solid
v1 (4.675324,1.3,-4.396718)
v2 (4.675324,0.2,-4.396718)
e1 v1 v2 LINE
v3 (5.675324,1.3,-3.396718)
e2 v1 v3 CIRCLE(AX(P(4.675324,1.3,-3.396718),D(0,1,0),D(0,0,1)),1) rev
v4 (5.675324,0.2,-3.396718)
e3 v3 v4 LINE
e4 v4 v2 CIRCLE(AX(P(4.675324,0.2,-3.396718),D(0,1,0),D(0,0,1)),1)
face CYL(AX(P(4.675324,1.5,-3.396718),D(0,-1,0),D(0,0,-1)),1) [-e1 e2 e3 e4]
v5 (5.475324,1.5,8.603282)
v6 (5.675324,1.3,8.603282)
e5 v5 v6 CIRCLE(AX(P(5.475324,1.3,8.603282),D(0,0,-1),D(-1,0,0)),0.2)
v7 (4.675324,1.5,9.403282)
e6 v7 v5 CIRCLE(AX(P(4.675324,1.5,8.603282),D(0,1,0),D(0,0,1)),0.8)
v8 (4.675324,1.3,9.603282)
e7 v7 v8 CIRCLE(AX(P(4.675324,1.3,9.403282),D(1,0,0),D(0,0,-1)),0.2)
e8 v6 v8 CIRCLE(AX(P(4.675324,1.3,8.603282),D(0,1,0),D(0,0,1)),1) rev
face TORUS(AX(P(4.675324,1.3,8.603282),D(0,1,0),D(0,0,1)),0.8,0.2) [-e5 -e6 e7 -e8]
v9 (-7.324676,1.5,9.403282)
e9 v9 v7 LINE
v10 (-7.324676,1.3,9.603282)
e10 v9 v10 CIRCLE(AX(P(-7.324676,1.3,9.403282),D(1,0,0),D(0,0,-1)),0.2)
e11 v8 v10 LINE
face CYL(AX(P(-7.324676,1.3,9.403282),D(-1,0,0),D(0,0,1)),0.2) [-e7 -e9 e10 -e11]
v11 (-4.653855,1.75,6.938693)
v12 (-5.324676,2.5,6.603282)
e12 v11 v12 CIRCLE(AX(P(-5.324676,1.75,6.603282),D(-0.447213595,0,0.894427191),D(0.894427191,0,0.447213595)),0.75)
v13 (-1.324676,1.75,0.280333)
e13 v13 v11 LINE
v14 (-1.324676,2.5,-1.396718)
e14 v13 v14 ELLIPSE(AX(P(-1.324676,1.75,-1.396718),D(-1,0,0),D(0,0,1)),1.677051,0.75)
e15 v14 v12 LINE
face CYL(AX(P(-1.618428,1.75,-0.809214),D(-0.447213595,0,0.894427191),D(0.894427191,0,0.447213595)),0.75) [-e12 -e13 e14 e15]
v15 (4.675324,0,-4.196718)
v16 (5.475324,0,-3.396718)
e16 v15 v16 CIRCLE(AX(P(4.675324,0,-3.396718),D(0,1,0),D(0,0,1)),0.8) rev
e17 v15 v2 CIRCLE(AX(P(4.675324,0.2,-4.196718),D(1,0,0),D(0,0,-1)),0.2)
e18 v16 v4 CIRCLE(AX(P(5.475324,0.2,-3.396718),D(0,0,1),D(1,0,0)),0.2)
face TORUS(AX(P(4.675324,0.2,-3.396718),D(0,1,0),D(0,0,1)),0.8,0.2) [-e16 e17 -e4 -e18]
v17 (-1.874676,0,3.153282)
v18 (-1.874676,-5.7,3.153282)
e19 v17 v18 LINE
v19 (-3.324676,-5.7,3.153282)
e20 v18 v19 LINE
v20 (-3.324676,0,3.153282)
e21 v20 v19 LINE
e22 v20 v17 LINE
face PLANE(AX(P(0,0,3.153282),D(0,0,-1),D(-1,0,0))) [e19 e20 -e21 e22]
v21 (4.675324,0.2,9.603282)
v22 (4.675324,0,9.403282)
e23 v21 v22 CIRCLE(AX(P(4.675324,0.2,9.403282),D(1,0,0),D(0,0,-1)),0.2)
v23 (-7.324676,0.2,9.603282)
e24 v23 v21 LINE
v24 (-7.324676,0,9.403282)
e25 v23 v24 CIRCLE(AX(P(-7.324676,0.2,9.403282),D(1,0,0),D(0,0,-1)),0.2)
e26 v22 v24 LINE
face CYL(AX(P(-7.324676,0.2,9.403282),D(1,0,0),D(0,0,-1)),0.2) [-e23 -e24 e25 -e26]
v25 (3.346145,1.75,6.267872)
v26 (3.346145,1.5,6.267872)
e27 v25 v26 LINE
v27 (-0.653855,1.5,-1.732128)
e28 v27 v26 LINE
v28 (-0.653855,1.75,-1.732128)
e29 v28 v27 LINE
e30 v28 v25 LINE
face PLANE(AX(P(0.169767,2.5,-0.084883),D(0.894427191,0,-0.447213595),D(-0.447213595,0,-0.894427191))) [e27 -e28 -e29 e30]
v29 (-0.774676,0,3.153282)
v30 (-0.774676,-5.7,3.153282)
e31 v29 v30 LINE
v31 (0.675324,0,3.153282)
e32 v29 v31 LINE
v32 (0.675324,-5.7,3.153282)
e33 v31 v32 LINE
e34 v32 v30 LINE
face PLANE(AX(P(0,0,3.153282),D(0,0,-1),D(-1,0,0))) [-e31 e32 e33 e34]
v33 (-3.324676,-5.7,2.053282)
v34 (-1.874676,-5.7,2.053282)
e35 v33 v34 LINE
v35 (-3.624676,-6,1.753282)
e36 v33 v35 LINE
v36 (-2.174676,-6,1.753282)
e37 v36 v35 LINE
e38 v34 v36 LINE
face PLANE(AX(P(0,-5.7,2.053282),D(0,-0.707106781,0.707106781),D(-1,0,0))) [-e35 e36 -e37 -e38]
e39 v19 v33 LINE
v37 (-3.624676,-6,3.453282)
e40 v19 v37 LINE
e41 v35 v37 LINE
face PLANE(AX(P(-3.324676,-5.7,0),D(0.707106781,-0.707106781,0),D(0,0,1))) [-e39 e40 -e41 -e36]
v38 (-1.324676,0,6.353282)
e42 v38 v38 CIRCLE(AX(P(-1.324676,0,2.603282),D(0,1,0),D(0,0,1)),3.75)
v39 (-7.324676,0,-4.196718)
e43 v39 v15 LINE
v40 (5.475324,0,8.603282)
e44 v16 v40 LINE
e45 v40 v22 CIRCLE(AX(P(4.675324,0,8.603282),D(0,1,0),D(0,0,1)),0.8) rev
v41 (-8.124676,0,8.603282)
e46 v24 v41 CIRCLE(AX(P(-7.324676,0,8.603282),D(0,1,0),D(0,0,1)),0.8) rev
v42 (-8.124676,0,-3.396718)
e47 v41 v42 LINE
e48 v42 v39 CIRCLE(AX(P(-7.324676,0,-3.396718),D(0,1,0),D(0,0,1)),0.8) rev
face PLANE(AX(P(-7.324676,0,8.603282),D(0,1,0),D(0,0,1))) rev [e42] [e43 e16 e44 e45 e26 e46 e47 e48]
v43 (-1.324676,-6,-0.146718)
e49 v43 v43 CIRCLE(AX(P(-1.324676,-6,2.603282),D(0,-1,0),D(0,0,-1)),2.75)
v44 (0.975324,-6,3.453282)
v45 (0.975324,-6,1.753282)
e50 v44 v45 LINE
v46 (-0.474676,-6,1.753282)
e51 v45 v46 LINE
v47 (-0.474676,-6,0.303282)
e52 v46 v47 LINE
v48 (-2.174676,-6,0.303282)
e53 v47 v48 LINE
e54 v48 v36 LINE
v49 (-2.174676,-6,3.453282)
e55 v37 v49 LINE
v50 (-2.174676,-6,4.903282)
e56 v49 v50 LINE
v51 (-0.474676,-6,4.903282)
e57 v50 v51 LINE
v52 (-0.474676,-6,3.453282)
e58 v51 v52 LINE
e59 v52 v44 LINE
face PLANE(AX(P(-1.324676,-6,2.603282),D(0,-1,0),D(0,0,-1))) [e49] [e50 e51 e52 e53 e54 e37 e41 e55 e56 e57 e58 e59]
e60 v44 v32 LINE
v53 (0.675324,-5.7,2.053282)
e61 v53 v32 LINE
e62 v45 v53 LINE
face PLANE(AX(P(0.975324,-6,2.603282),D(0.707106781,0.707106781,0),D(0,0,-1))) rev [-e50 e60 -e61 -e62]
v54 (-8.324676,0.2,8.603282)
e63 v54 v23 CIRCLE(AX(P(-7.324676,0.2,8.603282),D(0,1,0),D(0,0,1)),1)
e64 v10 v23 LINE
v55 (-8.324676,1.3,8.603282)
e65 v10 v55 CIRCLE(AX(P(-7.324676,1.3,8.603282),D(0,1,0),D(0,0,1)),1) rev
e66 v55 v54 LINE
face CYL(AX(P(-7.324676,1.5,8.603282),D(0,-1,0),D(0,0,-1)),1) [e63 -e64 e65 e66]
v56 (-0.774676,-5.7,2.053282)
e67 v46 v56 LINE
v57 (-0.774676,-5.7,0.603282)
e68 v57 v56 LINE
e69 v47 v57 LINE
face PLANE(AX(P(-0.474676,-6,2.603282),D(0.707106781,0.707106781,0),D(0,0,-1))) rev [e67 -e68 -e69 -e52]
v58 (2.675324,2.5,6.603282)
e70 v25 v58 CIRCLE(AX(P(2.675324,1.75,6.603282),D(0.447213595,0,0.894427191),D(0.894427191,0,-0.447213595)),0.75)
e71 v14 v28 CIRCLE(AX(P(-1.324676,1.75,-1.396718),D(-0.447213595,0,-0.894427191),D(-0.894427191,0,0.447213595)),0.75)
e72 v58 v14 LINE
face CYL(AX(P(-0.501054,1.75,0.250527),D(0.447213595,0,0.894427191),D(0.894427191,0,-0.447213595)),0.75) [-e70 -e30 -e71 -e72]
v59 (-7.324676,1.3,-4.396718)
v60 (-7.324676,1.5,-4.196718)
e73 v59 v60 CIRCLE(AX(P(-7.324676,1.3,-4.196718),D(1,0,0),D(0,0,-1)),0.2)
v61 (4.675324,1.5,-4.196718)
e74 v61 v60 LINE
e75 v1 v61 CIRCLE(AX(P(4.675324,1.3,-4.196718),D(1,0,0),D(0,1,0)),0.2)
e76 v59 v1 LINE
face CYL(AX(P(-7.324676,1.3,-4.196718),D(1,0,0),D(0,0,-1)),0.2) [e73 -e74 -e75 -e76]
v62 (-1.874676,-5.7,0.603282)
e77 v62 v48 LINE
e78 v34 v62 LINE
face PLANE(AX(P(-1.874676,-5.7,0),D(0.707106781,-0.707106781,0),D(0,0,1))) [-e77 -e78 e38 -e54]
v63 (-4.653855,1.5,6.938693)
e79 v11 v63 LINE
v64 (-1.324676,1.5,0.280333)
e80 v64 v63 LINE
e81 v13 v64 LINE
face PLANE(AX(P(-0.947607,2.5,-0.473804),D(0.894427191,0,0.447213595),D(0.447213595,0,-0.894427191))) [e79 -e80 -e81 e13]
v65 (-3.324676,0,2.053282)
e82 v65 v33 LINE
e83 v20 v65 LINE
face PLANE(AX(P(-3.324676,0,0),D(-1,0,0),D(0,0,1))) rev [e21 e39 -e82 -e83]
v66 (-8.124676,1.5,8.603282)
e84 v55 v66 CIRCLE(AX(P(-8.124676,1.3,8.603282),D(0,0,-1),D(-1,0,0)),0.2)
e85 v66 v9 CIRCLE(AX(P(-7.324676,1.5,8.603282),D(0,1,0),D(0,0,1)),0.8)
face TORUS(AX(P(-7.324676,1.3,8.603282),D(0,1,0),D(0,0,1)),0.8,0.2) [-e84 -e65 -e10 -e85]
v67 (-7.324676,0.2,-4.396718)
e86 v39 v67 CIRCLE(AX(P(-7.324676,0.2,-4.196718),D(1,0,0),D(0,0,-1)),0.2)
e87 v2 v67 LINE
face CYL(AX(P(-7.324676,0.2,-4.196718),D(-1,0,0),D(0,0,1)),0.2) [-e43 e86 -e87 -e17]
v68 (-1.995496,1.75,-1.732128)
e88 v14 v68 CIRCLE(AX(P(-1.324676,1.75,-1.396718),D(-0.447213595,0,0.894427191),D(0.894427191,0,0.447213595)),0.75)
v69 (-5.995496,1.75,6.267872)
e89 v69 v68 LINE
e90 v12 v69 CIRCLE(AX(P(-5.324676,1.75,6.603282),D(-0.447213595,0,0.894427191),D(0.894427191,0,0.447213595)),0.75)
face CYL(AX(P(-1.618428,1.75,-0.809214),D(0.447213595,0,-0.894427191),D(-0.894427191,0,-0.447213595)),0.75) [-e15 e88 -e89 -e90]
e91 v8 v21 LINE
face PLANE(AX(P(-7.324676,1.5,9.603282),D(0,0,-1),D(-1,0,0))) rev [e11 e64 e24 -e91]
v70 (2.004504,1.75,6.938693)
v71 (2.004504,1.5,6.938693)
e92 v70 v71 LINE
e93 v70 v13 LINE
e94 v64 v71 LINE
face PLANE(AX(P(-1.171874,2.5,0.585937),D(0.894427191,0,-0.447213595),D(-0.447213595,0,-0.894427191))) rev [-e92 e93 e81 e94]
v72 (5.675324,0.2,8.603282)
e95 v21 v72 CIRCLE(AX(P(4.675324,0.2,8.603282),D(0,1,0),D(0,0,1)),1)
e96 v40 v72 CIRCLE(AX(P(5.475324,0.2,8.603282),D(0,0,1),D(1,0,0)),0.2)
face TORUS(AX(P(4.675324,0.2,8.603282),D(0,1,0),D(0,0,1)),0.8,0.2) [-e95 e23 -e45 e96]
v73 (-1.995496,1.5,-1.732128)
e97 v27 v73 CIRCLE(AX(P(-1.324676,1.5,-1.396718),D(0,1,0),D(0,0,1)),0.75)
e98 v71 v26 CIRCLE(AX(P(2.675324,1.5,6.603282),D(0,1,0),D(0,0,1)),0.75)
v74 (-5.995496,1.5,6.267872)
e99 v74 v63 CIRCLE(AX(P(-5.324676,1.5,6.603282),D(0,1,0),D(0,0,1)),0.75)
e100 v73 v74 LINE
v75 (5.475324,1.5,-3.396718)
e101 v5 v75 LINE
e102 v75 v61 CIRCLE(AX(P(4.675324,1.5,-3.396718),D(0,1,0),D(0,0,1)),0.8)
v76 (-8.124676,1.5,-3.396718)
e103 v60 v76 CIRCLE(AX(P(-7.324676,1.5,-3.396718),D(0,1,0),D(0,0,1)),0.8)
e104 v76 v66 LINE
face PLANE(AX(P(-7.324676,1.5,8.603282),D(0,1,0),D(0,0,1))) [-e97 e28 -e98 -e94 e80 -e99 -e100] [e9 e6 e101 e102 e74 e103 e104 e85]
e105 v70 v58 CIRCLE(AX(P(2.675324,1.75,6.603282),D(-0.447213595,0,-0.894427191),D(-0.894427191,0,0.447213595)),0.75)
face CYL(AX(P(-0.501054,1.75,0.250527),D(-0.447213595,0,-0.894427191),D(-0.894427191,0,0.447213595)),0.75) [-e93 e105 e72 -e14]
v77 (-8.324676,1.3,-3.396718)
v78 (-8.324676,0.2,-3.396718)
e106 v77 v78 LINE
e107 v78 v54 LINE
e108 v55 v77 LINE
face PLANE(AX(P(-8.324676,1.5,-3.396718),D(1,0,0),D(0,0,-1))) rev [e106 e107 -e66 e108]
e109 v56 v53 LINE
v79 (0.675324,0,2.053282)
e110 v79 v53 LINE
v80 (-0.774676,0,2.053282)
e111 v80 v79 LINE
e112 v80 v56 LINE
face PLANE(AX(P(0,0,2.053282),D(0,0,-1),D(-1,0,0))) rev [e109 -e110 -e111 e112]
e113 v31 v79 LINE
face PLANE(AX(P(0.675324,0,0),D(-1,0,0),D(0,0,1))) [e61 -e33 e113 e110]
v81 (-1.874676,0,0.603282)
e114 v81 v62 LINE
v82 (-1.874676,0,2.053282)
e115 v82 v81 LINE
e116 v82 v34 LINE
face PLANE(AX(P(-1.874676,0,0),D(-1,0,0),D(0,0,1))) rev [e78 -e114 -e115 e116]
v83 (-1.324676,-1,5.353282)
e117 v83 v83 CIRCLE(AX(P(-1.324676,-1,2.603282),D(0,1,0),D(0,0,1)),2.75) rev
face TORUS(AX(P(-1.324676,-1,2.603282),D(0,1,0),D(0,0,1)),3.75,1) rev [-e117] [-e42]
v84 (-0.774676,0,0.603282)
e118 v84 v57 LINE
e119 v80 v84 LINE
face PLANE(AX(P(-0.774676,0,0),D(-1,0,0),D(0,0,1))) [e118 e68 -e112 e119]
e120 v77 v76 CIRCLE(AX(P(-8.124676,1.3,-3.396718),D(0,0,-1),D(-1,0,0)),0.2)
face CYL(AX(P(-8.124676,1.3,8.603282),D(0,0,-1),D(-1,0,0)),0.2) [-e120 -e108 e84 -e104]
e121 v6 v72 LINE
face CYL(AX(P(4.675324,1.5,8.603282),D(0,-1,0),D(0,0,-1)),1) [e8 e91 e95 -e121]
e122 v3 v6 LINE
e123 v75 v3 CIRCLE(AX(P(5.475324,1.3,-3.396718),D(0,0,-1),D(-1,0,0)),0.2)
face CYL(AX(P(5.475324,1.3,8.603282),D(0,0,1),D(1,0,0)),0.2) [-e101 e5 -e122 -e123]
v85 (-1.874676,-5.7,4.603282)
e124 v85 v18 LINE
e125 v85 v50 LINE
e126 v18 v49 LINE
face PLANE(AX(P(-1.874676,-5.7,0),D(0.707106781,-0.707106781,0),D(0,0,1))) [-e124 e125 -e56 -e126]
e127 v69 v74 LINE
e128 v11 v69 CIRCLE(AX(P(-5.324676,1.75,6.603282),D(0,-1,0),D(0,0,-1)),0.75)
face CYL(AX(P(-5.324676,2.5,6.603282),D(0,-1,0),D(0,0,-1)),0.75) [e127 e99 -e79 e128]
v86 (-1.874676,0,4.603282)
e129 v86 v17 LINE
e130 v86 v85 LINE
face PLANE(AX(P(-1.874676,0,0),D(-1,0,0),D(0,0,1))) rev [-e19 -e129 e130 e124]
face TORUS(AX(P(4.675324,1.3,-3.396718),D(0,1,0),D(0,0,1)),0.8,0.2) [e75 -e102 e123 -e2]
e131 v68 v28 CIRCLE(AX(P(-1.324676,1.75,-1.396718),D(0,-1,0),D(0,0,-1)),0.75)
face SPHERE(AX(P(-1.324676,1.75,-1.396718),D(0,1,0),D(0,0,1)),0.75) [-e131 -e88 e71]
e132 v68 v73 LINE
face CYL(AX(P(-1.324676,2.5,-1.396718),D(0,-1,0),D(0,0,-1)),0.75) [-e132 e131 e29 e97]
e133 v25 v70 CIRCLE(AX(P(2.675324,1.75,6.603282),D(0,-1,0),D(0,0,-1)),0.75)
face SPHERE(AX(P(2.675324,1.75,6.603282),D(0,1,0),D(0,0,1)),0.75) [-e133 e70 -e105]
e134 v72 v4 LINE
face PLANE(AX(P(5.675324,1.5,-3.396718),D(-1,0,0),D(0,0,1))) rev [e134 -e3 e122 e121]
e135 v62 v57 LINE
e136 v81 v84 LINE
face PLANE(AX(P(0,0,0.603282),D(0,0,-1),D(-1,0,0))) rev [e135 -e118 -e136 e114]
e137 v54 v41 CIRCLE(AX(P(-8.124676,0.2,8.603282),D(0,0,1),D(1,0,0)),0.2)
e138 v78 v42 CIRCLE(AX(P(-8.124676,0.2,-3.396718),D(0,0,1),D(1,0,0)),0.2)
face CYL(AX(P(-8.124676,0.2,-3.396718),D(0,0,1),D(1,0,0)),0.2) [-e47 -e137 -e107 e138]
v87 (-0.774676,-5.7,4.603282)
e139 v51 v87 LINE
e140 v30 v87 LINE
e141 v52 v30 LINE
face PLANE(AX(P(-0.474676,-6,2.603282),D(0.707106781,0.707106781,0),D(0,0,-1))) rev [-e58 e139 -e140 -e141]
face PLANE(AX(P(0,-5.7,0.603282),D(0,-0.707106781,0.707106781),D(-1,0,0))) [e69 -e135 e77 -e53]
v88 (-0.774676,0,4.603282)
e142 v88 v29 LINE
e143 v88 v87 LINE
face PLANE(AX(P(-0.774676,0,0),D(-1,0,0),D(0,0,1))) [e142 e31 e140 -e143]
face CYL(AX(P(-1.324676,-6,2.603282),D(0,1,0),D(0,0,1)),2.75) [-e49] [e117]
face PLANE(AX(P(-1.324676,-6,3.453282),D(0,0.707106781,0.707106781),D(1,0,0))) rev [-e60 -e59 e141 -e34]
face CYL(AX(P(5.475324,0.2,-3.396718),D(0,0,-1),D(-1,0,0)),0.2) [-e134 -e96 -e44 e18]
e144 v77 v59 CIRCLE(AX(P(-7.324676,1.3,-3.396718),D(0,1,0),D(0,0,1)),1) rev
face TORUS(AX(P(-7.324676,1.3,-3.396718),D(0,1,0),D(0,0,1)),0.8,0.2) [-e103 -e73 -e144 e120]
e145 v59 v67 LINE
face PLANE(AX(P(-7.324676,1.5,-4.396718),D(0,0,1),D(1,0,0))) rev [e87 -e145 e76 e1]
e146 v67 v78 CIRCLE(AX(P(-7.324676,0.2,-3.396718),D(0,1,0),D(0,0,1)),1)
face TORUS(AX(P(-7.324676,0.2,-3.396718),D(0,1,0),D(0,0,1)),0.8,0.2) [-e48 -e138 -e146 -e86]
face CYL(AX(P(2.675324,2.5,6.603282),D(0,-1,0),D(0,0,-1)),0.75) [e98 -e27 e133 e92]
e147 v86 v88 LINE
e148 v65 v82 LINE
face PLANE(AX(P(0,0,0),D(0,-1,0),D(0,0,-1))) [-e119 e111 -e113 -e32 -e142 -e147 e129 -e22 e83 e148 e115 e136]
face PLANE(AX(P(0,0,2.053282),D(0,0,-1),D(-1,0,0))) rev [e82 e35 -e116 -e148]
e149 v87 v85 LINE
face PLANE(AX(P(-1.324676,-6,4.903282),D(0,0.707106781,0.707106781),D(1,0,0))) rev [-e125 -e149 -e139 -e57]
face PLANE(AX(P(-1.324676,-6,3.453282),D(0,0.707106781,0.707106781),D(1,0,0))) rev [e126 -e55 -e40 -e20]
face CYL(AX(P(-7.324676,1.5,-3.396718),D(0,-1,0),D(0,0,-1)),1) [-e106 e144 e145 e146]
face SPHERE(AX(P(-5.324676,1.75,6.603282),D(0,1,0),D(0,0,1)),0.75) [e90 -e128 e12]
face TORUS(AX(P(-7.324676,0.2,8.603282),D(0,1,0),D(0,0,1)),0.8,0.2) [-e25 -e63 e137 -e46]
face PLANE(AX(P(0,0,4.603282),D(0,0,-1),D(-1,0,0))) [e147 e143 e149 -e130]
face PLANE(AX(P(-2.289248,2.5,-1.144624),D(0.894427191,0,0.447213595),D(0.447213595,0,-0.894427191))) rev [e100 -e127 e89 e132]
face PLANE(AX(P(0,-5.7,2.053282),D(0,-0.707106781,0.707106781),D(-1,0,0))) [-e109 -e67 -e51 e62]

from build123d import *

# Parameters (mm, degrees)
BOSS_EXTRUDE1_DEPTH = 1.5
SKETCH2_R           = 2.75
BOSS_EXTRUDE2_DEPTH = 6
SKETCH3_W           = 1.1
SKETCH3_H           = 1.45
SKETCH3_W_2         = 1.45
SKETCH3_H_2         = 1.1
CUT_EXTRUDE1_DEPTH  = 6
CHAMFER1_SIZE       = 0.3
FILLET1_R           = 1
FILLET3_R           = 0.2
BOSS_EXTRUDE3_DEPTH = 1
FILLET6_R           = 0.75


with BuildPart() as part:
    # Sketch1 → Boss-Extrude1 (new body)
    with BuildSketch(Plane(origin=(0, 0, 0), x_dir=(1, 0, 0), z_dir=(0, 1, 0))):
        with BuildLine():
            Line((-7.324675649, 4.396717546), (4.675324351, 4.396717546))
            ThreePointArc((4.675324351, 4.396717546), (5.382431132, 4.103824327), (5.675324351, 3.396717546))
            Line((5.675324351, 3.396717546), (5.675324351, -8.603282454))
            ThreePointArc((5.675324351, -8.603282454), (5.382431132, -9.310389235), (4.675324351, -9.603282454))
            Line((4.675324351, -9.603282454), (-7.324675649, -9.603282454))
            ThreePointArc((-7.324675649, -9.603282454), (-8.03178243, -9.310389235), (-8.324675649, -8.603282454))
            Line((-8.324675649, -8.603282454), (-8.324675649, 3.396717546))
            ThreePointArc((-8.324675649, 3.396717546), (-8.03178243, 4.103824327), (-7.324675649, 4.396717546))
        make_face()
    extrude(amount=BOSS_EXTRUDE1_DEPTH)

    # Sketch2 → Boss-Extrude2 (add)
    with BuildSketch(Plane.XZ):
        with Locations(Location((-1.324675649, 2.603282454, 0), (0, 0, 270))):
            Circle(SKETCH2_R)
    extrude(amount=BOSS_EXTRUDE2_DEPTH)

    # Sketch3 → Cut-Extrude1 (cut)
    with BuildSketch(Plane.XZ.offset(6)):
        with Locations((-1.324675649, 3.878282454)):
            Rectangle(SKETCH3_W, SKETCH3_H)
        with Locations((-0.049675649, 2.603282454)):
            Rectangle(SKETCH3_W_2, SKETCH3_H_2)
        with Locations((-1.324675649, 2.603282454)):
            Rectangle(SKETCH3_W, SKETCH3_H_2)
        with Locations((-2.599675649, 2.603282454)):
            Rectangle(SKETCH3_W_2, SKETCH3_H_2)
        with Locations((-1.324675649, 1.328282454)):
            Rectangle(SKETCH3_W, SKETCH3_H)
    extrude(amount=-CUT_EXTRUDE1_DEPTH, mode=Mode.SUBTRACT)

    # Chamfer1
    chamfer1_edges = [part.edges().sort_by_distance(p)[0] for p in [
        (-0.774675649, -6, 3.878282454),
        (-0.049675649, -6, 3.153282454),
        (0.675324351, -6, 2.603282454),
        (-0.774675649, -6, 1.328282454),
        (-2.599675649, -6, 3.153282454),
        (-1.324675649, -6, 4.603282454),
        (-1.874675649, -6, 3.878282454),
        (-3.324675649, -6, 2.603282454),
        (-2.599675649, -6, 2.053282454),
        (-1.874675649, -6, 1.328282454),
        (-1.324675649, -6, 0.603282454),
        (-0.049675649, -6, 2.053282454),
    ]]
    chamfer(chamfer1_edges, length=CHAMFER1_SIZE)

    # Fillet1
    fillet1_edges = [part.edges().sort_by_distance(p)[0] for p in [
        (-1.324675649, 0, 5.353282454),
    ]]
    fillet(fillet1_edges, radius=FILLET1_R)

    # Fillet3
    fillet3_edges = [part.edges().sort_by_distance(p)[0] for p in [
        (5.382431132, 1.5, 9.310389235),
        (-1.324675649, 0, 9.603282454),
        (-8.03178243, 0, 9.310389235),
        (5.675324351, 1.5, 2.603282454),
        (5.382431132, 1.5, -4.103824327),
        (-1.324675649, 1.5, -4.396717546),
        (-8.03178243, 1.5, -4.103824327),
        (-8.324675649, 1.5, 2.603282454),
        (-8.03178243, 1.5, 9.310389235),
        (-1.324675649, 1.5, 9.603282454),
        (-8.324675649, 0, 2.603282454),
        (-8.03178243, 0, -4.103824327),
        (-1.324675649, 0, -4.396717546),
        (5.382431132, 0, -4.103824327),
        (5.675324351, 0, 2.603282454),
        (5.382431132, 0, 9.310389235),
    ]]
    fillet(fillet3_edges, radius=FILLET3_R)

    # Sketch4 → Boss-Extrude3 (add)
    with BuildSketch(Plane(origin=(0, 1.5, 0), x_dir=(1, 0, 0), z_dir=(0, 1, 0))):
        with BuildLine():
            ThreePointArc((-0.653855256, 1.732127742), (-0.574675649, 1.396717546), (-0.653855256, 1.061307349))
            Line((-0.653855256, 1.061307349), (-1.324675649, -0.280333437))
            Line((-1.324675649, -0.280333437), (2.004503957, -6.938692651))
            ThreePointArc((2.004503957, -6.938692651), (3.010734547, -7.274102848), (3.346144744, -6.267872258))
            Line((3.346144744, -6.267872258), (-0.653855256, 1.732127742))
        make_face()
        with BuildLine():
            Line((-1.324675649, -0.280333437), (-0.653855256, 1.061307349))
            ThreePointArc((-0.653855256, 1.061307349), (-0.574675649, 1.396717546), (-0.653855256, 1.732127742))
            ThreePointArc((-0.653855256, 1.732127742), (-1.324675649, 2.146717546), (-1.995496043, 1.732127742))
            ThreePointArc((-1.995496043, 1.732127742), (-2.074675649, 1.396717546), (-1.995496043, 1.061307349))
            Line((-1.995496043, 1.061307349), (-1.324675649, -0.280333437))
        make_face()
        with BuildLine():
            Line((-4.653855256, -6.938692651), (-1.324675649, -0.280333437))
            Line((-1.324675649, -0.280333437), (-1.995496043, 1.061307349))
            ThreePointArc((-1.995496043, 1.061307349), (-2.074675649, 1.396717546), (-1.995496043, 1.732127742))
            Line((-1.995496043, 1.732127742), (-5.995496043, -6.267872258))
            ThreePointArc((-5.995496043, -6.267872258), (-5.660085846, -7.274102848), (-4.653855256, -6.938692651))
        make_face()
    extrude(amount=BOSS_EXTRUDE3_DEPTH)

    # Fillet6
    fillet6_edges = [part.edges().sort_by_distance(p)[0] for p in [
        (1.346144744, 2.5, 2.267872258),
        (-2.989265453, 2.5, 3.609513044),
        (-1.324675649, 2.5, -2.146717546),
        (-3.995496043, 2.5, 2.267872258),
        (-5.660085846, 2.5, 7.274102848),
        (0.339914154, 2.5, 3.609513044),
        (3.010734547, 2.5, 7.274102848),
    ]]
    fillet(fillet6_edges, radius=FILLET6_R - 0.0001)  # a hair under: the kernel refuses the full size


solid = part.part
